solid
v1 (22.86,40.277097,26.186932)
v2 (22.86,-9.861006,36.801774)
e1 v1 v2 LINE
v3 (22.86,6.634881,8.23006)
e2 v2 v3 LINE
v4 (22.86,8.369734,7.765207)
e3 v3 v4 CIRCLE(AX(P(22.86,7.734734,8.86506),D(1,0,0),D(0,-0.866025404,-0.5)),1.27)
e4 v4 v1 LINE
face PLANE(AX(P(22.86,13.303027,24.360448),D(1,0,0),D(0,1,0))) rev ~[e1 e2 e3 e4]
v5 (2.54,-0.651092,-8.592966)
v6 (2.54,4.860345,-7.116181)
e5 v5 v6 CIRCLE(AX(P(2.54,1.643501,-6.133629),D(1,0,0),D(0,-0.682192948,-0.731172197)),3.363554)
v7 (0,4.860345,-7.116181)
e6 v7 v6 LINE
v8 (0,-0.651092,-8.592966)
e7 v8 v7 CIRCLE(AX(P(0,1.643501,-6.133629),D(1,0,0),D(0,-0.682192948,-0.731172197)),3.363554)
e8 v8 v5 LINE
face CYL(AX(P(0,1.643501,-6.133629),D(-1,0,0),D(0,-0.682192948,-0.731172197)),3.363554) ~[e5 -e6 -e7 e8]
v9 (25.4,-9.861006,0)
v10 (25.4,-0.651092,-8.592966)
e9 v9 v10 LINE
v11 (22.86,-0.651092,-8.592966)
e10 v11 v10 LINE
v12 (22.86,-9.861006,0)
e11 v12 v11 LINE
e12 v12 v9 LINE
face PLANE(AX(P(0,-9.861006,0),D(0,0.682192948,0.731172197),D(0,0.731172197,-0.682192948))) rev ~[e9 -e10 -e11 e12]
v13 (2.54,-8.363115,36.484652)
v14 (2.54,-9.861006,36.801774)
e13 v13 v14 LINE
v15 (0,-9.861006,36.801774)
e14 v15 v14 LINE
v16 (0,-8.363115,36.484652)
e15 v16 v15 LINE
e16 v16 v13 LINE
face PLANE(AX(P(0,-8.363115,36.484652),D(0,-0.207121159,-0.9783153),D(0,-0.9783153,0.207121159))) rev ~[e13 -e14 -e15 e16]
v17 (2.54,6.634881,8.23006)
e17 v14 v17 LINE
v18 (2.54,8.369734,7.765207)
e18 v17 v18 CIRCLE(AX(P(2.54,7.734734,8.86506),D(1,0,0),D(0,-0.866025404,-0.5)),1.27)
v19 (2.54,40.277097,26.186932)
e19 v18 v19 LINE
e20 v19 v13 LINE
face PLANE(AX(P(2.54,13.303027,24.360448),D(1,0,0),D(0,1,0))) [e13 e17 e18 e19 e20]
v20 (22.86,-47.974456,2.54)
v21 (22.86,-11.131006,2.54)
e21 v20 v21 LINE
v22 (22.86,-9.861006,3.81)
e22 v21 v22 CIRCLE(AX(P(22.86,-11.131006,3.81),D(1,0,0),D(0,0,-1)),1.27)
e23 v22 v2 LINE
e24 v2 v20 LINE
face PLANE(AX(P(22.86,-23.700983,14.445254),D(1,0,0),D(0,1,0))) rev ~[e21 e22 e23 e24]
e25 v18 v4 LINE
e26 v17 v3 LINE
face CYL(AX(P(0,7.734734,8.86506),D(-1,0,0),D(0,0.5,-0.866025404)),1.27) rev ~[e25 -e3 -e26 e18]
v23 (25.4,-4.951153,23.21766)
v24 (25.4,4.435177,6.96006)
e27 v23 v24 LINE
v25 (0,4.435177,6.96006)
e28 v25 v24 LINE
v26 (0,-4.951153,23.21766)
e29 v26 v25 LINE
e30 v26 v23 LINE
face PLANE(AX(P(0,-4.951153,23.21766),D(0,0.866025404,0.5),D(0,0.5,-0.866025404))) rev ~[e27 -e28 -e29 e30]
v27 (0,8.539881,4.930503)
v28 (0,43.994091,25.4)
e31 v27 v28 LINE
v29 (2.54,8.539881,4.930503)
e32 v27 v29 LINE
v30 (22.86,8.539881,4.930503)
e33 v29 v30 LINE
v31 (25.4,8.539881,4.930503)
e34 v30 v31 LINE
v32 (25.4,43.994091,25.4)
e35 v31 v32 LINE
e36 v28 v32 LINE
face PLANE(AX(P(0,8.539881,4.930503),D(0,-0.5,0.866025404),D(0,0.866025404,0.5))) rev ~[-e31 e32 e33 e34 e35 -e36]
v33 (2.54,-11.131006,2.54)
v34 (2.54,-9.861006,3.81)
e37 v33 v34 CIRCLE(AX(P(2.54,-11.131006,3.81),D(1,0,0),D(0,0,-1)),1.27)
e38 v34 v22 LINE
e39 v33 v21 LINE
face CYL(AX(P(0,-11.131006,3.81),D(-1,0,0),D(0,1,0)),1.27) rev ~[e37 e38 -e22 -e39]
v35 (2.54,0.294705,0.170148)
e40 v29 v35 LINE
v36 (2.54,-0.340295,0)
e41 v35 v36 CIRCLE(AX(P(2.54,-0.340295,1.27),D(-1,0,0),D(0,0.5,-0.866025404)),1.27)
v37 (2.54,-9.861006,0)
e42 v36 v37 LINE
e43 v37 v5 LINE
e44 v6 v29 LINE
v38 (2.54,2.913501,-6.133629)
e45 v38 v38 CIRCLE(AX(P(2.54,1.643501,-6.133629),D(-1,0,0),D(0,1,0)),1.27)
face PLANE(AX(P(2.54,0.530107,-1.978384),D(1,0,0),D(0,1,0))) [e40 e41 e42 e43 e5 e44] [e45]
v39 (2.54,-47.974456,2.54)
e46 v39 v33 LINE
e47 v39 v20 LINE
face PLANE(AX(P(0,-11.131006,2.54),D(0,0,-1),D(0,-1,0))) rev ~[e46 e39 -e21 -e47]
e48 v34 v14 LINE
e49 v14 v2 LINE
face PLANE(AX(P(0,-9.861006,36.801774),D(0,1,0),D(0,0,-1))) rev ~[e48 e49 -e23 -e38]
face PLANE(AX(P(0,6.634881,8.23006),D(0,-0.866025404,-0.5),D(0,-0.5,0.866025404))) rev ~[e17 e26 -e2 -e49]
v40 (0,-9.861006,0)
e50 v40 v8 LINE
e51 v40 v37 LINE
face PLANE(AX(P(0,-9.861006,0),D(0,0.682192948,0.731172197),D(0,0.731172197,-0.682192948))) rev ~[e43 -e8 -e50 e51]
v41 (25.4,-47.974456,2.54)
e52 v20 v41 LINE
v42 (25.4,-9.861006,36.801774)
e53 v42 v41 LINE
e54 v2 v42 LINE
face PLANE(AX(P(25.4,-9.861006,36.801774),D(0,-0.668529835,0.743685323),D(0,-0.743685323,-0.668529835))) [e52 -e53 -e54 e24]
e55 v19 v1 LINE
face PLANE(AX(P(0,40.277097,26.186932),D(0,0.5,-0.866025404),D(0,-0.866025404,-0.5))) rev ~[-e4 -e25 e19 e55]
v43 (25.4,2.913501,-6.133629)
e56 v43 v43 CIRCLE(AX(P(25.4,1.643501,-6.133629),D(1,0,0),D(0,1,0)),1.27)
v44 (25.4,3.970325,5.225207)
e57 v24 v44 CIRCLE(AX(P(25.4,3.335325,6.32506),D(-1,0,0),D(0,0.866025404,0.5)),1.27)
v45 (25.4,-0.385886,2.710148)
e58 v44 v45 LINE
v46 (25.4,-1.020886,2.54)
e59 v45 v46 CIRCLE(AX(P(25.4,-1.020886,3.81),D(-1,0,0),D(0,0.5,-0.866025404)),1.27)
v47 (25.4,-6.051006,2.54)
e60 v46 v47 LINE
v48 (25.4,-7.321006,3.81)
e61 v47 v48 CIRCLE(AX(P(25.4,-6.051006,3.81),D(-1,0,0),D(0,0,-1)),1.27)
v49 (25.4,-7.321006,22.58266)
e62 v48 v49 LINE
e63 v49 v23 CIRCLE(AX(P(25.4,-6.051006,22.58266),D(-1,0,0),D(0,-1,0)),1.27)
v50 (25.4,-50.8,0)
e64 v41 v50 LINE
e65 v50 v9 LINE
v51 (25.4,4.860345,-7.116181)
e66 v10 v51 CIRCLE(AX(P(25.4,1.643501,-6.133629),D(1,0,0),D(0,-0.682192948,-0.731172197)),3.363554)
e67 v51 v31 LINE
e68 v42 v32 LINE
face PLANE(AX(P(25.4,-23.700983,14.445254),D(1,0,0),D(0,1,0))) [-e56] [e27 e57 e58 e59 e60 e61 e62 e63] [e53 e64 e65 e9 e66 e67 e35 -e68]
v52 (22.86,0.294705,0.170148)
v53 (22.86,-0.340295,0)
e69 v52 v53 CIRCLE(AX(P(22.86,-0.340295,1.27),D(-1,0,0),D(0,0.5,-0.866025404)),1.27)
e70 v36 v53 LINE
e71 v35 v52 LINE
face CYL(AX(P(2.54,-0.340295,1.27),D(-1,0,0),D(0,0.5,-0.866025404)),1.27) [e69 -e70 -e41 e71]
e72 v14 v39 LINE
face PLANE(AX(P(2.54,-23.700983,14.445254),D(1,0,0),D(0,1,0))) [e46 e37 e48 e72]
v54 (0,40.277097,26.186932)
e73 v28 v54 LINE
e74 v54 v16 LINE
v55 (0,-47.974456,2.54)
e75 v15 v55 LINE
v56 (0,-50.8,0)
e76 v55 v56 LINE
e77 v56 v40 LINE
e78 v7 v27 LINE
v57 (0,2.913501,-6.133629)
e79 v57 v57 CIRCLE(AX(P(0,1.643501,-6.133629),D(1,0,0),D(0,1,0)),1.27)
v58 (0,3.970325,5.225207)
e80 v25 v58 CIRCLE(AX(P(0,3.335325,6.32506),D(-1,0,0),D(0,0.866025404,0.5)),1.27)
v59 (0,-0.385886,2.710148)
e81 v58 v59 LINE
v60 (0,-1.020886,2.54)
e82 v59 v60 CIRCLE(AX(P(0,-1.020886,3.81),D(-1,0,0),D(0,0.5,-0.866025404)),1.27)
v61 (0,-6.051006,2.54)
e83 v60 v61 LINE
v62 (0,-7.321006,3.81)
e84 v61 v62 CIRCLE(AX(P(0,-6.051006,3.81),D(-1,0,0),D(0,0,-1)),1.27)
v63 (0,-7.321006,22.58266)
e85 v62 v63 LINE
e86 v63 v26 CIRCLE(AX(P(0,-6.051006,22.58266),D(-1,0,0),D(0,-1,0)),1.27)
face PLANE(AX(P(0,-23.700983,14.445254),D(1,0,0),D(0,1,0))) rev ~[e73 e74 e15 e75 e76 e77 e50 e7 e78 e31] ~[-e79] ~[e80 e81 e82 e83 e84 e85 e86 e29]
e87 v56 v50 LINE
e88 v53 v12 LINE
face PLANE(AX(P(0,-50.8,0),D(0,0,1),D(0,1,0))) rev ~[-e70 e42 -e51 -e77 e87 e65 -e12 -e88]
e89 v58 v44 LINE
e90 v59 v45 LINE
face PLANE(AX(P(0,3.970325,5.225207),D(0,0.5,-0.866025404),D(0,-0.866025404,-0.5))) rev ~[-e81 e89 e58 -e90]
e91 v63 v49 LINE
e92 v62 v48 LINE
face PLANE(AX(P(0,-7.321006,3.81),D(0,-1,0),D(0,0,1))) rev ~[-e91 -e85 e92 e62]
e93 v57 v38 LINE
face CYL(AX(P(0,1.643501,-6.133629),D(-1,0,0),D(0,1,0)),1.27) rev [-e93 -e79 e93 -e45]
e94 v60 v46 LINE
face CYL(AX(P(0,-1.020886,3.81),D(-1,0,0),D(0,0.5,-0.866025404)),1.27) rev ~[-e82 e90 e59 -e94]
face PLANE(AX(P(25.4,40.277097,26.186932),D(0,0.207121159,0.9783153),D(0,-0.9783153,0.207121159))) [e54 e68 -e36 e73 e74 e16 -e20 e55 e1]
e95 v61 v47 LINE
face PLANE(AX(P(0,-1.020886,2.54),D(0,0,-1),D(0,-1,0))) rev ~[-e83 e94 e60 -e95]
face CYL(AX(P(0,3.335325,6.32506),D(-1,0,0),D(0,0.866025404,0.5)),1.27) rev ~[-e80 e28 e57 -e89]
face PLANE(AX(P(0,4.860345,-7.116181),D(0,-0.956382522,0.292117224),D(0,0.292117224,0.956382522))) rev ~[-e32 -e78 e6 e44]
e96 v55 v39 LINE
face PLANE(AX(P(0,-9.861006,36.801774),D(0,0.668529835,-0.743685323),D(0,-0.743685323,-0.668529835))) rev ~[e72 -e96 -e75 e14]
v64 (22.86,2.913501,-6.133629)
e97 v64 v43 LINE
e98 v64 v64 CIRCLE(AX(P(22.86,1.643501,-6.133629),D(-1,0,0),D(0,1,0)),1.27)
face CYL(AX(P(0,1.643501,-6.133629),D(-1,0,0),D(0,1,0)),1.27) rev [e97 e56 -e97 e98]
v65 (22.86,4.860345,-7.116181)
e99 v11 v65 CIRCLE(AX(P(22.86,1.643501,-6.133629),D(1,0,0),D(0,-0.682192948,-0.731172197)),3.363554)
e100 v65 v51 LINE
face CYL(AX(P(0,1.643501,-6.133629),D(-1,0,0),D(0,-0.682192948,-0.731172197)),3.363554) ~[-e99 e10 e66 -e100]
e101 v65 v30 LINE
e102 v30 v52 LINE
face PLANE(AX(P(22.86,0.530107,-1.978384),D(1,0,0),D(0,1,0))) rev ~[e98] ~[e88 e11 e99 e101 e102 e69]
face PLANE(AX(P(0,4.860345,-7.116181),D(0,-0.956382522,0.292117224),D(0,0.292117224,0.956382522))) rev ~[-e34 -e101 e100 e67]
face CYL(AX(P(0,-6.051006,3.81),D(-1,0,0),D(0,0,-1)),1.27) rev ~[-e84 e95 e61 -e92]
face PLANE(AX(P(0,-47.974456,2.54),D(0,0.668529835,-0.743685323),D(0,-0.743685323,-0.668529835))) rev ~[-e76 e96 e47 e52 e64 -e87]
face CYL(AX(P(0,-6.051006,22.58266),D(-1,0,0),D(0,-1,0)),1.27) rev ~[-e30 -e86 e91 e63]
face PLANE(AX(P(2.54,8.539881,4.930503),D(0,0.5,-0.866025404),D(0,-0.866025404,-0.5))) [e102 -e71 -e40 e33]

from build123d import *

# Parameters (mm, degrees)
F0_R     = 1.27
F1_DEPTH = 25.4
F2_DEPTH = 2.54
F4_DEPTH = 2.54
F8_DEPTH = 20.32


# Not quite as in the source:
# - a feature names something its author has since deleted; it is built from what else it names


with BuildPart() as f1:
    # F0 (on Right) → F1 (new body)
    with BuildSketch(Plane.YZ):
        with BuildLine():
            Line((-50.8, 0), (-9.8610056184, 0))
            Line((-9.8610056184, 0), (-0.6510920475, -8.592966345))
            ThreePointArc((-0.6510920475, -8.592966345), (2.514052834, -9.3825729095), (4.8603454258, -7.1161811248))
            Line((4.8603454258, -7.1161811248), (8.5398813724, 4.9305028092))
            Line((8.5398813724, 4.9305028092), (43.9940905122, 25.4))
            Line((43.9940905122, 25.4), (40.2770972977, 26.1869323345))
            Line((40.2770972977, 26.1869323345), (8.3697336352, 7.7652073348))
            ThreePointArc((8.3697336352, 7.7652073348), (7.4060334479, 7.6383337982), (6.6348813724, 8.2300595976))
            Line((6.6348813724, 8.2300595976), (-9.8610056184, 36.8017739816))
            Line((-9.8610056184, 36.8017739816), (-9.8610056184, 3.81))
            ThreePointArc((-9.8610056184, 3.81), (-10.2329800063, 2.9119743879), (-11.1310056184, 2.54))
            Line((-11.1310056184, 2.54), (-47.9744556178, 2.54))
            Line((-47.9744556178, 2.54), (-50.8, 0))
        make_face()
        with Locations((1.6435009364, -6.1336289969)):
            Circle(F0_R, mode=Mode.SUBTRACT)
        with BuildLine():
            Line((-1.0208864232, 2.54), (-6.0510056184, 2.54))
            ThreePointArc((-6.0510056184, 2.54), (-6.9490312305, 2.9119743879), (-7.3210056184, 3.81))
            Line((-7.3210056184, 3.81), (-7.3210056184, 22.5826604048))
            ThreePointArc((-7.3210056184, 22.5826604048), (-6.3797058057, 23.8093862042), (-4.9511533556, 23.2176604048))
            Line((-4.9511533556, 23.2176604048), (4.4351768468, 6.9600595976))
            ThreePointArc((4.4351768468, 6.9600595976), (4.5620503834, 5.9963594103), (3.970324584, 5.2252073348))
            Line((3.970324584, 5.2252073348), (-0.3858864232, 2.7101477372))
            ThreePointArc((-0.3858864232, 2.7101477372), (-0.6921862359, 2.5832742006), (-1.0208864232, 2.54))
        make_face(mode=Mode.SUBTRACT)
    extrude(amount=F1_DEPTH)

    # F0 (on Right) → F2 (join)
    with BuildSketch(Plane.YZ):
        with BuildLine():
            Line((-9.8610056184, 36.8017739816), (-47.9744556178, 2.54))
            Line((-47.9744556178, 2.54), (-11.1310056184, 2.54))
            ThreePointArc((-11.1310056184, 2.54), (-10.2329800063, 2.9119743879), (-9.8610056184, 3.81))
            Line((-9.8610056184, 3.81), (-9.8610056184, 36.8017739816))
        make_face()
        with BuildLine():
            Line((-8.3631146249, 36.484652376), (-9.8610056184, 36.8017739816))
            Line((-9.8610056184, 36.8017739816), (6.6348813724, 8.2300595976))
            ThreePointArc((6.6348813724, 8.2300595976), (7.4060334479, 7.6383337982), (8.3697336352, 7.7652073348))
            Line((8.3697336352, 7.7652073348), (40.2770972977, 26.1869323345))
            Line((40.2770972977, 26.1869323345), (-8.3631146249, 36.484652376))
        make_face()
    extrude(amount=F2_DEPTH)

    # F3 (on face) → F4 (join)
    with BuildSketch(Plane.YZ.offset(25.4)):
        with BuildLine():
            Line((-9.8610056184, 3.81), (-9.8610056184, 36.8017739816))
            Line((-9.8610056184, 36.8017739816), (-47.9744556178, 2.54))
            Line((-47.9744556178, 2.54), (-11.1310056184, 2.54))
            ThreePointArc((-11.1310056184, 2.54), (-10.2329800063, 2.9119743879), (-9.8610056184, 3.81))
        make_face()
        with BuildLine():
            Line((40.2770972977, 26.1869323345), (-9.8610056184, 36.8017739816))
            Line((-9.8610056184, 36.8017739816), (6.6348813724, 8.2300595976))
            ThreePointArc((6.6348813724, 8.2300595976), (7.4060334479, 7.6383337982), (8.3697336352, 7.7652073348))
            Line((8.3697336352, 7.7652073348), (40.2770972977, 26.1869323345))
        make_face()
    extrude(amount=-F4_DEPTH)

    # F7 (on offset) → F8 (cut)
    with BuildSketch(Plane.YZ.offset(2.54)):
        with BuildLine():
            Line((8.5398813724, 4.9305028092), (0.2947045256, 0.1701477372))
            ThreePointArc((0.2947045256, 0.1701477372), (-0.0115952871, 0.0432742006), (-0.3402954744, 0))
            Line((-0.3402954744, 0), (-9.8610056184, 0))
            Line((-9.8610056184, 0), (-0.6510920475, -8.592966345))
            ThreePointArc((-0.6510920475, -8.592966345), (2.514052834, -9.3825729095), (4.8603454258, -7.1161811248))
            Line((4.8603454258, -7.1161811248), (8.5398813724, 4.9305028092))
        make_face()
    extrude(amount=F8_DEPTH, mode=Mode.SUBTRACT)


solid = f1.part
